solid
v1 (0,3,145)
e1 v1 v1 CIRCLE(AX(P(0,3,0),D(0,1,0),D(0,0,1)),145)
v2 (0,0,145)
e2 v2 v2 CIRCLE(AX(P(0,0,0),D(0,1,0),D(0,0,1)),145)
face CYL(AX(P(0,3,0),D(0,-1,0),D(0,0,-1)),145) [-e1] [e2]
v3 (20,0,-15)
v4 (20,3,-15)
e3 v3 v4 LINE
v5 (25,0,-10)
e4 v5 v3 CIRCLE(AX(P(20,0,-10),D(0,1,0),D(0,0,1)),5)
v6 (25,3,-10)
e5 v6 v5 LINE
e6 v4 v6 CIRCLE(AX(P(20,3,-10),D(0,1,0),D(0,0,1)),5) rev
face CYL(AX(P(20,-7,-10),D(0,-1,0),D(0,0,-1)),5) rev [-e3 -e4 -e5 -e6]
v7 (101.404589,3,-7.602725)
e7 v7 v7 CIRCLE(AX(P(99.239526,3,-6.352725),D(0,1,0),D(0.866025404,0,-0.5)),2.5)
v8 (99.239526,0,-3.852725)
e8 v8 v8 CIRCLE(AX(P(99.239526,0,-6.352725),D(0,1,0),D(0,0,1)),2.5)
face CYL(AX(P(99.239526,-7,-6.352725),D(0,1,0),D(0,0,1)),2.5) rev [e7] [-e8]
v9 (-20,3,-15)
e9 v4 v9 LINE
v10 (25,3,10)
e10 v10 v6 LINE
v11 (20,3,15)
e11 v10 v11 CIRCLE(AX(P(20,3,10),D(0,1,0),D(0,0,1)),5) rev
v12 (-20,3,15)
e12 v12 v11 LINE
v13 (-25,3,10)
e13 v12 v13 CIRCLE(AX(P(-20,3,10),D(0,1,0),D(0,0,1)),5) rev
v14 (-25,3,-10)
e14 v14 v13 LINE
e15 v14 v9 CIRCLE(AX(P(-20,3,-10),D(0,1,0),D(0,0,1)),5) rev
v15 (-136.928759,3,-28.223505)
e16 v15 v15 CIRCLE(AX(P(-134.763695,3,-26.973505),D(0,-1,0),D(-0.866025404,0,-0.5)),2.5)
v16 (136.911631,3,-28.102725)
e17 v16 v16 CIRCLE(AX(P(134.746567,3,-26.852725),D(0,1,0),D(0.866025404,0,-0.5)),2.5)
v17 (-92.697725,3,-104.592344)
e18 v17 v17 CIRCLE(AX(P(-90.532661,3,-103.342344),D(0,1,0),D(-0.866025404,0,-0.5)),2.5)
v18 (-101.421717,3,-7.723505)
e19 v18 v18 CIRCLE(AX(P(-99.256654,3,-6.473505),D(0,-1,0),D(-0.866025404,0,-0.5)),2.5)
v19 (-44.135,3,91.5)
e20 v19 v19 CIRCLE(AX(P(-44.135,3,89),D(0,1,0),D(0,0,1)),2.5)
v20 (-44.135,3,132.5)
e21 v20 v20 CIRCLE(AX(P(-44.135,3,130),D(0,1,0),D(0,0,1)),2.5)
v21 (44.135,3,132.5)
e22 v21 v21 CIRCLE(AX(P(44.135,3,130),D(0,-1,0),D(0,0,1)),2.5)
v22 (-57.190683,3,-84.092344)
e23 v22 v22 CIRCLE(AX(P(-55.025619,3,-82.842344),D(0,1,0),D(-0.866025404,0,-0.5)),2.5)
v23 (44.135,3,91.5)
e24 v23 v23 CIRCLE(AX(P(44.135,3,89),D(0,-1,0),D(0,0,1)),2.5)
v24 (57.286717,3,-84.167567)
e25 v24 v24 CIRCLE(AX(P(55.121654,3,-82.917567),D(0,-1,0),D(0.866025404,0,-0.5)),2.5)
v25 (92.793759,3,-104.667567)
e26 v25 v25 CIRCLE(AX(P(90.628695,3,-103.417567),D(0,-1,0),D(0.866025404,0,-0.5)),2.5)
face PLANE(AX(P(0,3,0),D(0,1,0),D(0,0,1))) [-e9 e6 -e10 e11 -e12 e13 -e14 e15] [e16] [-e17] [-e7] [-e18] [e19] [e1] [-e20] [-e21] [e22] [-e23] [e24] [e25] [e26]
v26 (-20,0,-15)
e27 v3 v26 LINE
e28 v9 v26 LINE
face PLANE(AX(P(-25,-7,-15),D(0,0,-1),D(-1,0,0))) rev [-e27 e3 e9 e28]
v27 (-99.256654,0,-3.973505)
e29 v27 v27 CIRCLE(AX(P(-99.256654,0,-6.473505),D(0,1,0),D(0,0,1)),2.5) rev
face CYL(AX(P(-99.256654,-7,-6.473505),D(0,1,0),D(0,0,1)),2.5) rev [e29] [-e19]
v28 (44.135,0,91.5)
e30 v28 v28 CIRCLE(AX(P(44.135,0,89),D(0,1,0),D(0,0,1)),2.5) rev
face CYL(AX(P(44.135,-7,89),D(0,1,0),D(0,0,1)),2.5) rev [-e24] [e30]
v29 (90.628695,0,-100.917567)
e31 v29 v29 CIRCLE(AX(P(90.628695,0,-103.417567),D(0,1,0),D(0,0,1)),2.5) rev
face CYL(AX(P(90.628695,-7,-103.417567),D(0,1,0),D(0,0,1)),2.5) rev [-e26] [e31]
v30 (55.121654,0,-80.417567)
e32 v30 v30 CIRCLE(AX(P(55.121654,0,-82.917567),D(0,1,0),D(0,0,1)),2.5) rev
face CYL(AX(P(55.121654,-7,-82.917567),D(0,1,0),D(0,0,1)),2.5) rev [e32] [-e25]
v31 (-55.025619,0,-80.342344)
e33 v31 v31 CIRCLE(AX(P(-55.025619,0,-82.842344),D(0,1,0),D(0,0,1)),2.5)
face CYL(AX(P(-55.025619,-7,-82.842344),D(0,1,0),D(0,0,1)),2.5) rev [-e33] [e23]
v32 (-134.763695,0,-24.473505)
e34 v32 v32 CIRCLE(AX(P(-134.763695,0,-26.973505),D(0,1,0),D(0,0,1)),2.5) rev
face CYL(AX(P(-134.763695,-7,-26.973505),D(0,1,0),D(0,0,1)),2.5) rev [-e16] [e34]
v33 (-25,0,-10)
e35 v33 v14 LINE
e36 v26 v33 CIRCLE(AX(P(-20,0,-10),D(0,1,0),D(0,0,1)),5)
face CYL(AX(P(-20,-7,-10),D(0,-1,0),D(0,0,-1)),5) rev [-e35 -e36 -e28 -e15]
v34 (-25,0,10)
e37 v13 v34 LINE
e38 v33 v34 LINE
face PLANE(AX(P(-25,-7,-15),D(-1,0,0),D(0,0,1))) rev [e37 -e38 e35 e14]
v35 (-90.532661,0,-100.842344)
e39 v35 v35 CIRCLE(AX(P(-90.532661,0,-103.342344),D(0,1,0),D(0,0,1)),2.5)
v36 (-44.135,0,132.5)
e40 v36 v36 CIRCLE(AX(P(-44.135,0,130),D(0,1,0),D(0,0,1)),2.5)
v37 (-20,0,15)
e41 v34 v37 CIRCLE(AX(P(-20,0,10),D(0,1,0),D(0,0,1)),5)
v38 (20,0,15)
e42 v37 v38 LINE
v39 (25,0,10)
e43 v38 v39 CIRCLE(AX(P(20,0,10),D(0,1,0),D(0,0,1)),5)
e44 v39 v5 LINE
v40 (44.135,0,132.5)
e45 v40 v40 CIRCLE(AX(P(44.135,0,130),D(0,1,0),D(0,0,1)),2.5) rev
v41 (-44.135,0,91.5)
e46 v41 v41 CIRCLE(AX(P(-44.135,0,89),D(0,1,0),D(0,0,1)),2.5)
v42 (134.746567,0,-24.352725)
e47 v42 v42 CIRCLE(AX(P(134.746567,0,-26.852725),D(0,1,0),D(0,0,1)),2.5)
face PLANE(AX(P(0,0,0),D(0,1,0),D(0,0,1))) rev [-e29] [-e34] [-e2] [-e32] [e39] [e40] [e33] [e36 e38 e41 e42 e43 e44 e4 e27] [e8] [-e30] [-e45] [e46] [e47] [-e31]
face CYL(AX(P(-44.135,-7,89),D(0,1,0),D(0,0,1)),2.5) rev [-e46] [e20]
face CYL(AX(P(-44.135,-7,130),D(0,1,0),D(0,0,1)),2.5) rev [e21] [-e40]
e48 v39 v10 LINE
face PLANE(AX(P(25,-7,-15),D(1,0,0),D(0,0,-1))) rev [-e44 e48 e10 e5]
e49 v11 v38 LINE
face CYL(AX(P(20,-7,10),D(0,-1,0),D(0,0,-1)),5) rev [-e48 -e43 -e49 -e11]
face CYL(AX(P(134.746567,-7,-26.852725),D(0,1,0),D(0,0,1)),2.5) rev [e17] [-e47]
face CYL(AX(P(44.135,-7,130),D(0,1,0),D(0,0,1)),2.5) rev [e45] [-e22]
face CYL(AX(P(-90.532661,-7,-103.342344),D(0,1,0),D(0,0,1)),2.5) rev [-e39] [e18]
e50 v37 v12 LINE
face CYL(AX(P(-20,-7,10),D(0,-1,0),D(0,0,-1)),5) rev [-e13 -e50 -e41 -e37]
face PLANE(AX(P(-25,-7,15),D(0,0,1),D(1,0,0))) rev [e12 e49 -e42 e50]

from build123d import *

# Parameters (mm, degrees)
SKETCH_1_R                   = 145
EXTRUDE_1_DEPTH              = 3
SKETCH_2_R                   = 2.5
CUT_EXTRUDE_1_DEPTH          = 10
PATTERN_CIRCULAR_1_OUTLINE_R = 2.5
PATTERN_CIRCULAR_1_DEPTH     = 3
SKETCH_5_W                   = 50
SKETCH_5_H                   = 30
CUT_EXTRUDE_2_DEPTH          = 10
FILLET_1_R                   = 5


# Read off the part's stored shape, not the designer's step: 阵列(圆周)1
with BuildPart() as part:
    # 草图1 → 凸台-拉伸1 (new body)
    with BuildSketch(Plane(origin=(0, 0, 0), x_dir=(1, 0, 0), z_dir=(0, 1, 0))):
        with Locations(Location((0, 0, 0), (0, 0, 270))):
            Circle(SKETCH_1_R)
    extrude(amount=EXTRUDE_1_DEPTH)

    # 草图2 → 切除-拉伸1 (cut)
    with BuildSketch(Plane(origin=(0, 3, 0), x_dir=(1, 0, 0), z_dir=(0, 1, 0))):
        with Locations(Location((-44.135, -89, 0), (0, 0, 270))):
            Circle(SKETCH_2_R)
        with Locations(Location((-44.135, -130, 0), (0, 0, 270))):
            Circle(SKETCH_2_R)
    cut_extrude_1 = extrude(amount=-CUT_EXTRUDE_1_DEPTH, mode=Mode.SUBTRACT)

    # 镜向1: 切除-拉伸1 across plane
    add(cut_extrude_1.mirror(Plane(origin=(0, 0, 0), x_dir=(0, 0, 1), z_dir=(1, 0, 0))), mode=Mode.SUBTRACT)

    # 阵列(圆周)1 outline → 阵列(圆周)1 (cut)
    with BuildSketch(Plane(origin=(0, 0, 0), x_dir=(1, 0, 0), z_dir=(0, 1, 0))):
        with Locations((55.121653534, 82.91756691)):
            Circle(PATTERN_CIRCULAR_1_OUTLINE_R)
        with Locations((90.628695089, 103.41756691)):
            Circle(PATTERN_CIRCULAR_1_OUTLINE_R)
        with Locations((-99.256653534, 6.473504518)):
            Circle(PATTERN_CIRCULAR_1_OUTLINE_R)
        with Locations((-134.763695089, 26.973504518)):
            Circle(PATTERN_CIRCULAR_1_OUTLINE_R)
        with Locations((99.239525897, 6.352725277)):
            Circle(PATTERN_CIRCULAR_1_OUTLINE_R)
        with Locations((-90.532661016, 103.342344321)):
            Circle(PATTERN_CIRCULAR_1_OUTLINE_R)
        with Locations((-55.025619461, 82.842344321)):
            Circle(PATTERN_CIRCULAR_1_OUTLINE_R)
        with Locations((134.746567453, 26.852725277)):
            Circle(PATTERN_CIRCULAR_1_OUTLINE_R)
    extrude(amount=PATTERN_CIRCULAR_1_DEPTH, mode=Mode.SUBTRACT)

    # 草图5 → 切除-拉伸2 (cut)
    with BuildSketch(Plane(origin=(0, 3, 0), x_dir=(1, 0, 0), z_dir=(0, 1, 0))):
        Rectangle(SKETCH_5_W, SKETCH_5_H)
    extrude(amount=-CUT_EXTRUDE_2_DEPTH, mode=Mode.SUBTRACT)

    # 圆角1
    fillet_1_edges = [part.edges().sort_by_distance(p)[0] for p in [
        (25, 1.5, -15),
        (25, 1.5, 15),
        (-25, 1.5, 15),
        (-25, 1.5, -15),
    ]]
    fillet(fillet_1_edges, radius=FILLET_1_R)


solid = part.part
